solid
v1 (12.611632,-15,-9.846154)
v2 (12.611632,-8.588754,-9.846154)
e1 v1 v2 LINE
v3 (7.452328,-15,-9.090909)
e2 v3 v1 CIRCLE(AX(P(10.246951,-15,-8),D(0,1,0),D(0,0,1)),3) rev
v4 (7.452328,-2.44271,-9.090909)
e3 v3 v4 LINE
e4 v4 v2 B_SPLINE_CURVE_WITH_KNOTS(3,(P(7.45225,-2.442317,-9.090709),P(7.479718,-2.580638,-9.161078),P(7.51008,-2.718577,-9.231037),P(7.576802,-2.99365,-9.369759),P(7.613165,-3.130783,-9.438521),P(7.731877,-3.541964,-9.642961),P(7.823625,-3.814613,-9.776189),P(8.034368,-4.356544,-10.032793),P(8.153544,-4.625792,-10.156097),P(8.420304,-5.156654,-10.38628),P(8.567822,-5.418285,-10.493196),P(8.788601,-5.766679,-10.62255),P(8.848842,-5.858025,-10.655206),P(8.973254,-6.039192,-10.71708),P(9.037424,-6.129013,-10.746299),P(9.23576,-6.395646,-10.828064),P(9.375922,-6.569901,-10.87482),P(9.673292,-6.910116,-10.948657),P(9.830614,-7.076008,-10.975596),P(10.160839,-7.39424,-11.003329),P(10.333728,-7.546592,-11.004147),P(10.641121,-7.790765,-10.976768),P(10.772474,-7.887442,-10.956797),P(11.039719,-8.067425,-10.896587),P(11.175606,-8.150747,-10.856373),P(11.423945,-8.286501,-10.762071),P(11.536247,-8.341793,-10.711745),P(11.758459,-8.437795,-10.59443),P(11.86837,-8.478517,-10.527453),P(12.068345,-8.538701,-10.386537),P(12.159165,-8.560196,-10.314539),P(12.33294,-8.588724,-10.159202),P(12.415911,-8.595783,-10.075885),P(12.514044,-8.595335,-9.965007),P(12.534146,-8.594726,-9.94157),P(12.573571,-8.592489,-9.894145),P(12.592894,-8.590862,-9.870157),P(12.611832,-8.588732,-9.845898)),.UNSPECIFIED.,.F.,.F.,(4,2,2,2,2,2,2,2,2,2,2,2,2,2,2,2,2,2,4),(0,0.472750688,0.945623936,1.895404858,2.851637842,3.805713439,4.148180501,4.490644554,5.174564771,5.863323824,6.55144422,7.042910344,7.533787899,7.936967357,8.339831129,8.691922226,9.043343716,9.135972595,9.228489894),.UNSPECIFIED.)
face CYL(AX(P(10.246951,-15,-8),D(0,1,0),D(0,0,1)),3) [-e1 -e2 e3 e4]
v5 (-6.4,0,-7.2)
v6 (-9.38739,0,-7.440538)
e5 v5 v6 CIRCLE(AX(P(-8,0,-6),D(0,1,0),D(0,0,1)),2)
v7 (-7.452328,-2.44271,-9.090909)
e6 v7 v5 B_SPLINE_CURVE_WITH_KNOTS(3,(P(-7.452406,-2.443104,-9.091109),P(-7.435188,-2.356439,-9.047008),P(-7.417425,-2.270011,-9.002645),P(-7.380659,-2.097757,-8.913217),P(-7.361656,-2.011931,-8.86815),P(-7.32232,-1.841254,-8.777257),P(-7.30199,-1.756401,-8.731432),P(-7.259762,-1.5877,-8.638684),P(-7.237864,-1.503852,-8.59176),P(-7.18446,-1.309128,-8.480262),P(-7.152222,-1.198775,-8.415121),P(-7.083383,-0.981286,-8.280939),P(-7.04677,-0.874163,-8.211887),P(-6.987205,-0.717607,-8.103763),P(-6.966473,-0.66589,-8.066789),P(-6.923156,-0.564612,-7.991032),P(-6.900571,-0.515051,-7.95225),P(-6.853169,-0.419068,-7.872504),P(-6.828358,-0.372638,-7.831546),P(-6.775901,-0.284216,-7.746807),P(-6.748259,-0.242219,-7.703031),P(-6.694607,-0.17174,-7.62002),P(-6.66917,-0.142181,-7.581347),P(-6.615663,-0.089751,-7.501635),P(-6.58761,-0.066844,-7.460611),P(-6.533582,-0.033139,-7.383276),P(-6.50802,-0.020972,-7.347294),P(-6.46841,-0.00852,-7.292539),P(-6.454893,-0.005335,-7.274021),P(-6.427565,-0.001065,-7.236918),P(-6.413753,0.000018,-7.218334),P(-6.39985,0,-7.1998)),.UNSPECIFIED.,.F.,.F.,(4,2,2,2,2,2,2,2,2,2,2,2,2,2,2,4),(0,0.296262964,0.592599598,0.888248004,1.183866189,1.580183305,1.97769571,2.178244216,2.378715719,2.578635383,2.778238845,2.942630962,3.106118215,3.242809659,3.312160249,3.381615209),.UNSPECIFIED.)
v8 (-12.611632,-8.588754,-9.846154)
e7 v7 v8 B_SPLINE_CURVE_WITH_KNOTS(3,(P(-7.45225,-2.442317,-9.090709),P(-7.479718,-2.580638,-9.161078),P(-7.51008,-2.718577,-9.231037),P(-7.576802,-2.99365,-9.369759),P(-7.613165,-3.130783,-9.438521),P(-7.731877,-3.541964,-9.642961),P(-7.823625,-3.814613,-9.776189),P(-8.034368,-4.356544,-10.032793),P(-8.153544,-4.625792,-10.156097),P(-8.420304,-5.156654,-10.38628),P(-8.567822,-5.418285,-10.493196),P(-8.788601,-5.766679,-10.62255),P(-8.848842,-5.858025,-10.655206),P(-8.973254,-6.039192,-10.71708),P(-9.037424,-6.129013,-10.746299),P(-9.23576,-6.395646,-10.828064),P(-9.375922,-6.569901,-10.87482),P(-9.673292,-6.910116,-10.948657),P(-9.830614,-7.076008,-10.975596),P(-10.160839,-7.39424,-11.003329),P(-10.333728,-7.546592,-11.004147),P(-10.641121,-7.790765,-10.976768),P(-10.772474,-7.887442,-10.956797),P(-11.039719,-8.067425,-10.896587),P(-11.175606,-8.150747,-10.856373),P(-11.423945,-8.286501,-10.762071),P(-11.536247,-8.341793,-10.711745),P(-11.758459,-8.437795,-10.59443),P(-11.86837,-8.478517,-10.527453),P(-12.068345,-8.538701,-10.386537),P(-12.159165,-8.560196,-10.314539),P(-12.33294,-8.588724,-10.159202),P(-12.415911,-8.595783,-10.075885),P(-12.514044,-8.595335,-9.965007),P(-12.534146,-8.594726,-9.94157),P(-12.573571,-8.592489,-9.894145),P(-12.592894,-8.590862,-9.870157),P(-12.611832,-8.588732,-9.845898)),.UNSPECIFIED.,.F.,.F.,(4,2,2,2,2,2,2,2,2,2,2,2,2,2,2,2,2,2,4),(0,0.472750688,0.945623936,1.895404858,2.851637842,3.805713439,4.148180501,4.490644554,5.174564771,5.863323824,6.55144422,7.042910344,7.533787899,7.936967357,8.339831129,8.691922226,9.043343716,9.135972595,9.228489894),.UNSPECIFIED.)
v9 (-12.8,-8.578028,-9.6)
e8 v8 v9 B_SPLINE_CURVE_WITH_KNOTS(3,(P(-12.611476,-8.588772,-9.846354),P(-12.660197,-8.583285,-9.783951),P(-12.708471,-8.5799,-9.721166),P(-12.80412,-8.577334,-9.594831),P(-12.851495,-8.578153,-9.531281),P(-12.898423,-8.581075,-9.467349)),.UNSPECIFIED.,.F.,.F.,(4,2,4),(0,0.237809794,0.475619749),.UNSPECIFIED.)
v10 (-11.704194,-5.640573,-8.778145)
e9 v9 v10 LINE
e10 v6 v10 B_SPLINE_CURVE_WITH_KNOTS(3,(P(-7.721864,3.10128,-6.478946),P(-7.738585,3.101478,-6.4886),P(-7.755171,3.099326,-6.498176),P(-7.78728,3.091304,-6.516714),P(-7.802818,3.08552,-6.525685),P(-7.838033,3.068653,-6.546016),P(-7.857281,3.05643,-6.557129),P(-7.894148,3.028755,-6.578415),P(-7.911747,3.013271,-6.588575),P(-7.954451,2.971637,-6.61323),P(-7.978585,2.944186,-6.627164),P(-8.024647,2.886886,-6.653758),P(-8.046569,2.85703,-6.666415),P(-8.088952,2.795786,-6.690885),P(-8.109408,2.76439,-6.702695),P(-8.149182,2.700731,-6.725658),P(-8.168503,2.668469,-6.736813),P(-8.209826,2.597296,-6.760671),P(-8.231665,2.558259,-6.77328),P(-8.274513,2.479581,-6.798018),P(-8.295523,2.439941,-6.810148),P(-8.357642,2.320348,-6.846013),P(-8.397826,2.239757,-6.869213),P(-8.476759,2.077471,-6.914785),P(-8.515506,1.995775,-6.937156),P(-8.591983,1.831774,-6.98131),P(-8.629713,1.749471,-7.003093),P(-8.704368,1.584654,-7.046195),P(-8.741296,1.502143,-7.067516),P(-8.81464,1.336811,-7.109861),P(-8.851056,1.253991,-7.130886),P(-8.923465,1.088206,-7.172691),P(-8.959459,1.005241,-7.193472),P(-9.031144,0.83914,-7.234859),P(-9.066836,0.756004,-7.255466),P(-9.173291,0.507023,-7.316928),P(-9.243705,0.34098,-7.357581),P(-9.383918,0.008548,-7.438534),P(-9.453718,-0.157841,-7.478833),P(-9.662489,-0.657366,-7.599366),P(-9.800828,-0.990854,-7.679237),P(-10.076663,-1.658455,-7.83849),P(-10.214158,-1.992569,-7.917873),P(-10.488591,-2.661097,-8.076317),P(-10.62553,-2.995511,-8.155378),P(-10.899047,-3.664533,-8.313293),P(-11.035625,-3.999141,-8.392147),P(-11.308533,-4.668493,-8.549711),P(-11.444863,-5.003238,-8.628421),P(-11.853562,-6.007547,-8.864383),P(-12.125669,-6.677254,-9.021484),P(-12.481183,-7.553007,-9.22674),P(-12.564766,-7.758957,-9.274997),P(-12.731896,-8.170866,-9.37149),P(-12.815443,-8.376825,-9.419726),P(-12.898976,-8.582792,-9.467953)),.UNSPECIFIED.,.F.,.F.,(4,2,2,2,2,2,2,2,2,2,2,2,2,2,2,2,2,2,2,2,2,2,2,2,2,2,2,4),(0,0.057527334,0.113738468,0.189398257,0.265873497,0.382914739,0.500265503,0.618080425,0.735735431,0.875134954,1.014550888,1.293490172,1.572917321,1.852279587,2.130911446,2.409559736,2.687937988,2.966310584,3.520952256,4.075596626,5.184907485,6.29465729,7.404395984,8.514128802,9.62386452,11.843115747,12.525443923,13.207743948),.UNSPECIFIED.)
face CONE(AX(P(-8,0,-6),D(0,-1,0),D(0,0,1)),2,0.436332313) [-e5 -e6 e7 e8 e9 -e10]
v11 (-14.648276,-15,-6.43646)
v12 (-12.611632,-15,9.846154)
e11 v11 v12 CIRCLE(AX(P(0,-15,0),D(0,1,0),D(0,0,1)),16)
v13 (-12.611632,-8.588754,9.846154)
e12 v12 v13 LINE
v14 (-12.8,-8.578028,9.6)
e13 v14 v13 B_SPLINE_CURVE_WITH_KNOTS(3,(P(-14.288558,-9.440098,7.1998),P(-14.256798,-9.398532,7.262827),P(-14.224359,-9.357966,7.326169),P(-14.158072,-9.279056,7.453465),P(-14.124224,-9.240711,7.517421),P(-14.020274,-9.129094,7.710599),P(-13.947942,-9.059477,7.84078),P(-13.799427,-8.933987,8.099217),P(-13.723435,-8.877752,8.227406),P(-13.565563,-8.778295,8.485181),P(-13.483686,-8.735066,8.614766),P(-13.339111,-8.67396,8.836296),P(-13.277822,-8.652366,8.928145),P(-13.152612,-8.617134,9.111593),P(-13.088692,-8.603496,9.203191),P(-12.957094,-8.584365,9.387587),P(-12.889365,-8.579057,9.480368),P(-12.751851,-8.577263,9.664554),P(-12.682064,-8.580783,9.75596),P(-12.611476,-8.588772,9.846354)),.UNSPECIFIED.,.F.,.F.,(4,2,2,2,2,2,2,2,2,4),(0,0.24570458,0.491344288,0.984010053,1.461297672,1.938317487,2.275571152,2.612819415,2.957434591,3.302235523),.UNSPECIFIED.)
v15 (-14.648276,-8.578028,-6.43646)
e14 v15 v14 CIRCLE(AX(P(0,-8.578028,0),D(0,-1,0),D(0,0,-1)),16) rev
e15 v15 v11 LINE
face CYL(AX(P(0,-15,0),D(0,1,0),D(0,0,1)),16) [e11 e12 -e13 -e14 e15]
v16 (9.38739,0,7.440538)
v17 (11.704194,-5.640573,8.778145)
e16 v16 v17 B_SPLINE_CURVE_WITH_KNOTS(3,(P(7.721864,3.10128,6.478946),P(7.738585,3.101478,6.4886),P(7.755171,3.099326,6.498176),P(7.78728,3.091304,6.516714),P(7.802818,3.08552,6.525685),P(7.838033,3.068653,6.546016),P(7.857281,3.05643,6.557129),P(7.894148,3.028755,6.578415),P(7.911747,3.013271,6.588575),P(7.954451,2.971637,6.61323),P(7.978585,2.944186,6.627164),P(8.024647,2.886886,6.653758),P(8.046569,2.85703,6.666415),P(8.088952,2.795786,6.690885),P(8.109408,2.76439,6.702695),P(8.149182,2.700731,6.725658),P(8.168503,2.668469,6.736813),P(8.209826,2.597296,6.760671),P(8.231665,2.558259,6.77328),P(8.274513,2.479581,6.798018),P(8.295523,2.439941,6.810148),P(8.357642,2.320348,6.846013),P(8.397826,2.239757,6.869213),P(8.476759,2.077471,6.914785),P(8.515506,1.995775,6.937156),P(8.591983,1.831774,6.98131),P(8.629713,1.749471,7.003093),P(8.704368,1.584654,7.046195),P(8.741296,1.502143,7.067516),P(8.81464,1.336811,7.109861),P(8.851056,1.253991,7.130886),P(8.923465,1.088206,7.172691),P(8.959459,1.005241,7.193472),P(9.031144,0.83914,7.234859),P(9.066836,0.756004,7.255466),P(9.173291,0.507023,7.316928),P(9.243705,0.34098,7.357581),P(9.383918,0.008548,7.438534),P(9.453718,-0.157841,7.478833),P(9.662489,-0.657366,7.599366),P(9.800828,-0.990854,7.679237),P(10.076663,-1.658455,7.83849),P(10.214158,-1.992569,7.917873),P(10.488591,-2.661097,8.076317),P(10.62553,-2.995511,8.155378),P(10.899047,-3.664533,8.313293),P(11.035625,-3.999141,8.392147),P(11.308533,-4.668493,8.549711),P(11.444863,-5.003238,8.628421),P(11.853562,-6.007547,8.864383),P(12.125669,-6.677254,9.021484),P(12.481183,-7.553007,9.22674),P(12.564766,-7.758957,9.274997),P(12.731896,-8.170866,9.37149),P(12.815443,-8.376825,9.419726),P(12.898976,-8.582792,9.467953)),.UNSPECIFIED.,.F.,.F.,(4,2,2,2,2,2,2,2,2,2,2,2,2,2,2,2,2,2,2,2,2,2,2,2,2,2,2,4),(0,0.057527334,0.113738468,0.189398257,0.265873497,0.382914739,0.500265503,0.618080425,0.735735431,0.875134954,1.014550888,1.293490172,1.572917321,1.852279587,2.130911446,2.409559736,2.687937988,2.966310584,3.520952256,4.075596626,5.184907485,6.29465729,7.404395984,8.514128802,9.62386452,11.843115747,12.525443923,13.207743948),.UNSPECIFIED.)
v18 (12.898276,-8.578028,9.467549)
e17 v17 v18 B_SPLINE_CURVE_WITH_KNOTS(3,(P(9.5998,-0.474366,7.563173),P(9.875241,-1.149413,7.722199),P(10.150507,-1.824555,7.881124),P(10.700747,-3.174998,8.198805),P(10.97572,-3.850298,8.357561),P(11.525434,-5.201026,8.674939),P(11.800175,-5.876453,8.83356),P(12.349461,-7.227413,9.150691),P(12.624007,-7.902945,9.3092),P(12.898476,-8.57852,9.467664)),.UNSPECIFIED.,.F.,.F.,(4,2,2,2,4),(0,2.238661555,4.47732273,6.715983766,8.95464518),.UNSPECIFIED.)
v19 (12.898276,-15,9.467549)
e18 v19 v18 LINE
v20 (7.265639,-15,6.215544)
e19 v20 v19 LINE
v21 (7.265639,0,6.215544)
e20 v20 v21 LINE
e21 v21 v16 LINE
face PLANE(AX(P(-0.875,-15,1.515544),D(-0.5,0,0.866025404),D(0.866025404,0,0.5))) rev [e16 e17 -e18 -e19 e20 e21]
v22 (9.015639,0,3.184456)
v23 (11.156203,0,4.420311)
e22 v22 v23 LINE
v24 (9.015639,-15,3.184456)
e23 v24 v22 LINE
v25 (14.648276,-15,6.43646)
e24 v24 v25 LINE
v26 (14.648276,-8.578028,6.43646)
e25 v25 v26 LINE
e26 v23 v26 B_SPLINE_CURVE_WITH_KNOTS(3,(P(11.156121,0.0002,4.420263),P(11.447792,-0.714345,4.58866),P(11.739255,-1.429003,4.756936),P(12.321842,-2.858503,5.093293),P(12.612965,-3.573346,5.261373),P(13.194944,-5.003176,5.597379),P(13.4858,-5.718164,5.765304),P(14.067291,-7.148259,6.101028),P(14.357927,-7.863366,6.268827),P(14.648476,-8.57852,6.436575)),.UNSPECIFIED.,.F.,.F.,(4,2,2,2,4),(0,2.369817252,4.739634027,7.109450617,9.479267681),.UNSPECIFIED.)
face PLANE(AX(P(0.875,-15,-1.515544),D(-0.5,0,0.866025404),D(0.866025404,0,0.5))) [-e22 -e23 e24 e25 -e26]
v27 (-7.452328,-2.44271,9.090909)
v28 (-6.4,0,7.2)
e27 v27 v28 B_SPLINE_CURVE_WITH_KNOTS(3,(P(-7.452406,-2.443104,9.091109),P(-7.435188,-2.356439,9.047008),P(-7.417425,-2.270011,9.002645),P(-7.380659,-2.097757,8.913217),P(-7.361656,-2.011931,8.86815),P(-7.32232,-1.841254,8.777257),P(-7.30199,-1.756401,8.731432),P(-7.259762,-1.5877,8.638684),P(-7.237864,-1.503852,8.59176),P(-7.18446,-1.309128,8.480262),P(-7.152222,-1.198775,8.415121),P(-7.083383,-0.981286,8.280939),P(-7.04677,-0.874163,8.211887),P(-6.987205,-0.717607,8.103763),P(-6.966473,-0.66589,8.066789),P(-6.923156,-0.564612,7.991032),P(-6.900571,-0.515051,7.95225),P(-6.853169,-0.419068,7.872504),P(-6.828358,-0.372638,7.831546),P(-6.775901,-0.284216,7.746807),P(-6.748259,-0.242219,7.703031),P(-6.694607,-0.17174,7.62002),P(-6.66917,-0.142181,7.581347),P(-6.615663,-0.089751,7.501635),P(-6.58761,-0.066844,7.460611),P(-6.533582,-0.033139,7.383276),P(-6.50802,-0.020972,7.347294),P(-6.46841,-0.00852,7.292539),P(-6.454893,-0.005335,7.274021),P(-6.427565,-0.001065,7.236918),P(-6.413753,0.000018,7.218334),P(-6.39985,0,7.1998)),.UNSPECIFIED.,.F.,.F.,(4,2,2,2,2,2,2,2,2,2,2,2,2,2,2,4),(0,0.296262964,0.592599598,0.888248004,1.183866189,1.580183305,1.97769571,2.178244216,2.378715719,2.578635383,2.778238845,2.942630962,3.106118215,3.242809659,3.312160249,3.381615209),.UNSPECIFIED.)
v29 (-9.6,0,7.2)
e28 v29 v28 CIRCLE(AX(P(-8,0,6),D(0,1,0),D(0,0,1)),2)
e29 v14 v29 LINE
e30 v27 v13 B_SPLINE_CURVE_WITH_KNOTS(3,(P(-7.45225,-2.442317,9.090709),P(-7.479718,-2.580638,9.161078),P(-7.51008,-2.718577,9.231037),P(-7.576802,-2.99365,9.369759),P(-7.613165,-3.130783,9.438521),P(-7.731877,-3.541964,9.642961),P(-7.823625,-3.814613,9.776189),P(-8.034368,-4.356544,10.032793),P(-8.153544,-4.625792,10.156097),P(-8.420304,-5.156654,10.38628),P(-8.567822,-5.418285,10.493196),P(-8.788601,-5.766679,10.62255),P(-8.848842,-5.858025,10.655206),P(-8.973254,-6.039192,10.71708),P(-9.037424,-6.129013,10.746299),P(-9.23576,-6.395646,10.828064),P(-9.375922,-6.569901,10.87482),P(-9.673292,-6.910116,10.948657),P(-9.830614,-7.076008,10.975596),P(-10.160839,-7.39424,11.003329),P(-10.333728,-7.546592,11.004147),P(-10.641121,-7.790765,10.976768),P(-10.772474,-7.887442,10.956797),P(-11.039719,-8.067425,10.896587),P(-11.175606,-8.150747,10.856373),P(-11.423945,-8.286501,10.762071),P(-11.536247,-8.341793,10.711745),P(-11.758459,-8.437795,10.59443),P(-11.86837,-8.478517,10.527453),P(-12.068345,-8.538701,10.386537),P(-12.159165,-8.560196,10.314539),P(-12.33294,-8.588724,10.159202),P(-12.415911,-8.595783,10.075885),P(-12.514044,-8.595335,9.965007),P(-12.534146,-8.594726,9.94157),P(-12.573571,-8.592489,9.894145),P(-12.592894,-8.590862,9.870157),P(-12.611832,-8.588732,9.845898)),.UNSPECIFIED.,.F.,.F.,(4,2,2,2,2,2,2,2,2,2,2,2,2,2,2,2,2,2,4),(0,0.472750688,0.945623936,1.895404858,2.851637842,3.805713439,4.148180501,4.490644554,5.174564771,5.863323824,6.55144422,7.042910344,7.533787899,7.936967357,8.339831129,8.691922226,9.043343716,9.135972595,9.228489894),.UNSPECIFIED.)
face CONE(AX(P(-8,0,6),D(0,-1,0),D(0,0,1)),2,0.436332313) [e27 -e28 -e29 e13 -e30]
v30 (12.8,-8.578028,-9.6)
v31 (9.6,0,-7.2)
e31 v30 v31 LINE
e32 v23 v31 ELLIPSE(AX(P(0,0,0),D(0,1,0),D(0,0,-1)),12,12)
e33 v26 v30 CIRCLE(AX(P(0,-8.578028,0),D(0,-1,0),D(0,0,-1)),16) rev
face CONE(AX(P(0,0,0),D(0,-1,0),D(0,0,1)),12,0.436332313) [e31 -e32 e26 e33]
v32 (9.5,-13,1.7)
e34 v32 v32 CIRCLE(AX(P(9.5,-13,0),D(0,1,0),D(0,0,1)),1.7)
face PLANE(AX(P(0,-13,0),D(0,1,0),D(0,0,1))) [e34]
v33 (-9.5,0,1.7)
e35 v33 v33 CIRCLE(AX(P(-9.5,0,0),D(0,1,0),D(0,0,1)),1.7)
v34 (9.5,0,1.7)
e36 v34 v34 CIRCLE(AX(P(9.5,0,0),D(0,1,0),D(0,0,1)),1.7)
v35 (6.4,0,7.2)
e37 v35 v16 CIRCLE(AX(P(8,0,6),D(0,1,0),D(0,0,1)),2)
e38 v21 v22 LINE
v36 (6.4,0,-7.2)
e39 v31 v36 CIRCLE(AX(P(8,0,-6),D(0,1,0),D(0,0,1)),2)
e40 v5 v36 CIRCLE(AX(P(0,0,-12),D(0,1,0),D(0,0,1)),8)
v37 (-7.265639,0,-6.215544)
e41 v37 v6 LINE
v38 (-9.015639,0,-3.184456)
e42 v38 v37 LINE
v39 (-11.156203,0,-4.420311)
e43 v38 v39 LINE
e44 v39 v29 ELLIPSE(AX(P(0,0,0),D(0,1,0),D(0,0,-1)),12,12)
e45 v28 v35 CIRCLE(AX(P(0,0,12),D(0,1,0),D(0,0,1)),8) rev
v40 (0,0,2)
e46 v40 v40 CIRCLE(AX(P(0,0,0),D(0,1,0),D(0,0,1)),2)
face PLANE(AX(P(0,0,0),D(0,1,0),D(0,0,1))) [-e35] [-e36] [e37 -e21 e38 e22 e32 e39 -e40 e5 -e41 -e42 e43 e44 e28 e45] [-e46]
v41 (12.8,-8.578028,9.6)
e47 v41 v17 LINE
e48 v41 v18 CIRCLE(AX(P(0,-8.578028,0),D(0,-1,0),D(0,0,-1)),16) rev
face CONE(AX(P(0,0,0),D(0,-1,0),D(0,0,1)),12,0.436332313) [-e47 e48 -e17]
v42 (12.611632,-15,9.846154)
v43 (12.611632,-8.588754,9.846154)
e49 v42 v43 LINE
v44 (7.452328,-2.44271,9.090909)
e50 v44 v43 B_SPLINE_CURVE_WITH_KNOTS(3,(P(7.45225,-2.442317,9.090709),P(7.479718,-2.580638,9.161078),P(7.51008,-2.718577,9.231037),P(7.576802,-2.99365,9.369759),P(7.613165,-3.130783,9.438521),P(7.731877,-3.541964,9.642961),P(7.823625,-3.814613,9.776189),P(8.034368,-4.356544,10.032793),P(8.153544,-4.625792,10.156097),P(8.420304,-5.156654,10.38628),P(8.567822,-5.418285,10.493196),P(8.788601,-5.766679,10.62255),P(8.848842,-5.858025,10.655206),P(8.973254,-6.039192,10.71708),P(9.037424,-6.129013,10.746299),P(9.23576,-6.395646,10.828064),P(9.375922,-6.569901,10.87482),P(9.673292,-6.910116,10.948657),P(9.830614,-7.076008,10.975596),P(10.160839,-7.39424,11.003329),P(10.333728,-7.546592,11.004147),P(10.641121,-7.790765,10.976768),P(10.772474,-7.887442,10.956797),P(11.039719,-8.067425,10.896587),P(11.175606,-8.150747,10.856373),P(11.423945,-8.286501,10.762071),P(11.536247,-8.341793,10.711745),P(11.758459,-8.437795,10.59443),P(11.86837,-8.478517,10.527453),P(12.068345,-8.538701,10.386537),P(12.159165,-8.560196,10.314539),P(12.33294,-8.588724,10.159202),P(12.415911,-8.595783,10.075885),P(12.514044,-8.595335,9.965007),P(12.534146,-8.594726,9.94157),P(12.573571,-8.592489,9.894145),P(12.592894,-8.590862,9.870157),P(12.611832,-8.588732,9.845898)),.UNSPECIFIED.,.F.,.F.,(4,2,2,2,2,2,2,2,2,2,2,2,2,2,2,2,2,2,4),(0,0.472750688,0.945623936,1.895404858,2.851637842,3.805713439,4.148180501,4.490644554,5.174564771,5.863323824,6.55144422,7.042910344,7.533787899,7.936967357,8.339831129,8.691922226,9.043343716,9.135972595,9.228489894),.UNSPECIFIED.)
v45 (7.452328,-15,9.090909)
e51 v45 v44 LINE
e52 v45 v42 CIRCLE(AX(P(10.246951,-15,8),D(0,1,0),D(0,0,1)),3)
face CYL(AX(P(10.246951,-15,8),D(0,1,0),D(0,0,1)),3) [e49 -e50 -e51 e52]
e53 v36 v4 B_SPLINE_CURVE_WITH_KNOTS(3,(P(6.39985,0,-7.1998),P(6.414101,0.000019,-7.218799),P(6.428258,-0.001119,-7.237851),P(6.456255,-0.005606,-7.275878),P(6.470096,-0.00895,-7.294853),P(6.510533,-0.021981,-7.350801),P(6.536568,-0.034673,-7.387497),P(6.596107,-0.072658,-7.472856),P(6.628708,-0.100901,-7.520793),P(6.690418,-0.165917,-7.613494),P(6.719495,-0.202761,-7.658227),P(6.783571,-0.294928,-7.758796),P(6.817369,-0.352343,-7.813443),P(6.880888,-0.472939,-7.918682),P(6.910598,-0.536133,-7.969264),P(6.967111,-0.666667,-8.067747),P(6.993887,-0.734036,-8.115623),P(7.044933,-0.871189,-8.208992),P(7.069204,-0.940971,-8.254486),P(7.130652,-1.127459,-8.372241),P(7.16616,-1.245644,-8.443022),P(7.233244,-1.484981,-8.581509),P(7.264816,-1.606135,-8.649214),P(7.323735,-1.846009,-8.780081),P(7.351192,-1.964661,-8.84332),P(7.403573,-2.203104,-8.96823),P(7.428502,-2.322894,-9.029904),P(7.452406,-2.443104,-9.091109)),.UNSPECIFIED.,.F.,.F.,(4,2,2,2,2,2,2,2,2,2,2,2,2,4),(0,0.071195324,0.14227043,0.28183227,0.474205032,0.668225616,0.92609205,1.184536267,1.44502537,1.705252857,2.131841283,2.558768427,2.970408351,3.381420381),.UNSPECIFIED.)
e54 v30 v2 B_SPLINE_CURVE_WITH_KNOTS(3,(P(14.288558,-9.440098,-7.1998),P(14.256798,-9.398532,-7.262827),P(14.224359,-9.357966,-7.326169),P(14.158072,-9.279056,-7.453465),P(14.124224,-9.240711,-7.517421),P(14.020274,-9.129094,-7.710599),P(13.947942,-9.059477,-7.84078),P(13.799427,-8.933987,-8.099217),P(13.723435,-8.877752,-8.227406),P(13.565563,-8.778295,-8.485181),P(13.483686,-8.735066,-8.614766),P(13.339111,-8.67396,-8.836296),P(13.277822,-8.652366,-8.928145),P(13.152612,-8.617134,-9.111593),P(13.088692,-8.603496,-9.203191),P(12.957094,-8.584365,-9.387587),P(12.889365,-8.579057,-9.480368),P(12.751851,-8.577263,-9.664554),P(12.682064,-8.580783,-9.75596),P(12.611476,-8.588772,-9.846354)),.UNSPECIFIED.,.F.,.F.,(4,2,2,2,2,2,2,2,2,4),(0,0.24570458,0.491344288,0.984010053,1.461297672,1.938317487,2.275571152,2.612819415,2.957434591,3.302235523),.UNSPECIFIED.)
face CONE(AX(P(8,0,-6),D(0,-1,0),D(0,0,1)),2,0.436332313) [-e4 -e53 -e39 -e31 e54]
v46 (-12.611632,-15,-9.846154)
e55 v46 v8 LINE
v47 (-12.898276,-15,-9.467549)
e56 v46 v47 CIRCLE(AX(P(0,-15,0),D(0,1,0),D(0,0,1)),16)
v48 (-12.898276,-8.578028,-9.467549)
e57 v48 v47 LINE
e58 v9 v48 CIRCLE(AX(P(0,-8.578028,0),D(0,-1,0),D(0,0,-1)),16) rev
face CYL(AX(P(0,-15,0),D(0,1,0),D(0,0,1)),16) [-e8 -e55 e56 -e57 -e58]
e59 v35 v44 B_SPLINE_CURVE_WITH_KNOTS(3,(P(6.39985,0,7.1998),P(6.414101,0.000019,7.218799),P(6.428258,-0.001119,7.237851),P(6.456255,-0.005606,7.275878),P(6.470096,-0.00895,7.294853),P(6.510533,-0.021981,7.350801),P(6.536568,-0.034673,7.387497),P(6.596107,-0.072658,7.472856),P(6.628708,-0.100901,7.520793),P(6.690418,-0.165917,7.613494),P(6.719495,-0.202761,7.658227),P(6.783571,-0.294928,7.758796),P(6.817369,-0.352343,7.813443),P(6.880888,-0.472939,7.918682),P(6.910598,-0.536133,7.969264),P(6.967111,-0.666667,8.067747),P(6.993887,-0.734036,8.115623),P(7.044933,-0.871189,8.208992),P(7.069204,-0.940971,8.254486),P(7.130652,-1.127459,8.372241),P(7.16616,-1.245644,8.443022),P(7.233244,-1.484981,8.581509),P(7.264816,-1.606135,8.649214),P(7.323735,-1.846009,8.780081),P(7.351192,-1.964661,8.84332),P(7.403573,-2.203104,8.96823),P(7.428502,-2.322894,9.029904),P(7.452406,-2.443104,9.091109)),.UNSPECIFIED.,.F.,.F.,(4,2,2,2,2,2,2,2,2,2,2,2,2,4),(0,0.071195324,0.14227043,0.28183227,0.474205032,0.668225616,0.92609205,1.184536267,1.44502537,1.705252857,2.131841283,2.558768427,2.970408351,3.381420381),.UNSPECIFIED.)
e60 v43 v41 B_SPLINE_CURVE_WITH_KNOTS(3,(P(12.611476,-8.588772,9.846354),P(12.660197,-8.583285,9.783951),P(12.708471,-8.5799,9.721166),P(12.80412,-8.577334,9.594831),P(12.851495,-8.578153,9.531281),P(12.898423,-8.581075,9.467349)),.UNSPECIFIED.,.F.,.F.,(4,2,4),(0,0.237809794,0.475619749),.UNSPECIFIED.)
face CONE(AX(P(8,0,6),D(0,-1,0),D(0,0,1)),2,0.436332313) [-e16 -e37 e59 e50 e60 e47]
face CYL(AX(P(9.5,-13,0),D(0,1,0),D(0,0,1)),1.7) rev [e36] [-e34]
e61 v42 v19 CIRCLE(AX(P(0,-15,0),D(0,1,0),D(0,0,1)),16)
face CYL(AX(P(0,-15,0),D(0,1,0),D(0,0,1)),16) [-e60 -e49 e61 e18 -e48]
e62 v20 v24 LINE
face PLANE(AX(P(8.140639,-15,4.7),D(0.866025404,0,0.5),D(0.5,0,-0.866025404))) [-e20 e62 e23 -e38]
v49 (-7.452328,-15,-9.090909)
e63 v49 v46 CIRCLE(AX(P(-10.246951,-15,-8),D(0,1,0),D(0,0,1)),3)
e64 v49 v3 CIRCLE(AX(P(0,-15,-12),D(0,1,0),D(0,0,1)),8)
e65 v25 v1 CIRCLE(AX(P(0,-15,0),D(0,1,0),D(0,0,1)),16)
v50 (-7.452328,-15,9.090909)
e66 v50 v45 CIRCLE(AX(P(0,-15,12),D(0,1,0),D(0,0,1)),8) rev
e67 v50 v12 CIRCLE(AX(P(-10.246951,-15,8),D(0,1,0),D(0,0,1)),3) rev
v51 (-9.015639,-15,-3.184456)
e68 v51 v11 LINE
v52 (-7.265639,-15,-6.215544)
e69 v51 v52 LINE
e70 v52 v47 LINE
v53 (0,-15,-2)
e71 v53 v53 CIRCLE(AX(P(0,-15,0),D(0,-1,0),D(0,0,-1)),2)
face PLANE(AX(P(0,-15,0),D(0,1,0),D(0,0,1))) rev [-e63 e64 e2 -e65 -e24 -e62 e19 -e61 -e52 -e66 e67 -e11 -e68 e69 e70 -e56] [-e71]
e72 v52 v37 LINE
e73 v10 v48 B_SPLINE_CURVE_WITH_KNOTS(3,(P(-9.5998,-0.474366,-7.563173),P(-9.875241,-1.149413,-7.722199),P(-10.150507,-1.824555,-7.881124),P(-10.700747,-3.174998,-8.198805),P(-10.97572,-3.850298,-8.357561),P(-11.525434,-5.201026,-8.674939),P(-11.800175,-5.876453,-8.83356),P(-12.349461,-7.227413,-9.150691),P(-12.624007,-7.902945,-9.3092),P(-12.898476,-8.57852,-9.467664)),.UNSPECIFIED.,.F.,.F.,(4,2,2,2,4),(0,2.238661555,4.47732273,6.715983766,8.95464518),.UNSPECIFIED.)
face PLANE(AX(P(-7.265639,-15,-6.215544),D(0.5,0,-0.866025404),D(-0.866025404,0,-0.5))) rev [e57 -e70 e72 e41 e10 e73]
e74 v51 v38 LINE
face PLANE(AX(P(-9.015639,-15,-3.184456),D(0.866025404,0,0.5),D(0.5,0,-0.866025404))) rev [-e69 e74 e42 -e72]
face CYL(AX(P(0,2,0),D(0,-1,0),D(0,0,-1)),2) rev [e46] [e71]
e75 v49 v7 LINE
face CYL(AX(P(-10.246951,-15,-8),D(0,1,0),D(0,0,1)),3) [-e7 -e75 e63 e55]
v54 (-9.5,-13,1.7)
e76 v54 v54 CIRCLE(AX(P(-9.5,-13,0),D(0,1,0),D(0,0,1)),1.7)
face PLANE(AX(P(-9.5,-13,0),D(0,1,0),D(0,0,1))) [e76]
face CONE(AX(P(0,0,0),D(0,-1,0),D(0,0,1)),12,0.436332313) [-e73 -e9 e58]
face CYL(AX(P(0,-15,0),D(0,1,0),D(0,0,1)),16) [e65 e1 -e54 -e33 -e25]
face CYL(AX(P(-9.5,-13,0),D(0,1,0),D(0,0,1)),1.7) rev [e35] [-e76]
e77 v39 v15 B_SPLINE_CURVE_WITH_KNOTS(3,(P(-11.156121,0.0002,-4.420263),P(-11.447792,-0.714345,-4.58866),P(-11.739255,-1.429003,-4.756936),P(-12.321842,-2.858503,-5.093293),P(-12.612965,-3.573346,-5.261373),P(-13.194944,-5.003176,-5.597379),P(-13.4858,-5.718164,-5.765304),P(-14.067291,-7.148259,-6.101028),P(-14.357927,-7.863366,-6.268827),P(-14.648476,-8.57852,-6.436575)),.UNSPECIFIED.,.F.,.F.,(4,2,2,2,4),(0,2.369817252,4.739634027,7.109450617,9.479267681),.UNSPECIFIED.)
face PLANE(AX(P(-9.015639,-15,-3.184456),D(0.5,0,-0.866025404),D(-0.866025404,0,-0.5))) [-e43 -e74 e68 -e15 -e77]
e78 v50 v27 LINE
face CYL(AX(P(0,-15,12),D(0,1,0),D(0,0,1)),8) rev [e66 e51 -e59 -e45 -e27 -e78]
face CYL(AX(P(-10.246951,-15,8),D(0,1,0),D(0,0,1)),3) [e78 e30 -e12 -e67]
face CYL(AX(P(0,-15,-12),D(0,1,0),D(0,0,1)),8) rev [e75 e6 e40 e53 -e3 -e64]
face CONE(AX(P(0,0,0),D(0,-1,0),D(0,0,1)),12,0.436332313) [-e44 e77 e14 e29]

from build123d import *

# Parameters (mm, degrees)
BOSS_EXTRUDE1_DEPTH = 15
BOSS_EXTRUDE1_TAPER = -25
SKETCH2_R           = 2
CUT_EXTRUDE1_DEPTH  = 17
SKETCH3_R           = 32.062922841
CUT_EXTRUDE2_DEPTH  = 29.471632885
SKETCH1_3_R         = 1.7
CUT_EXTRUDE3_DEPTH  = 13


with BuildPart() as part:
    # Sketch1 → Boss-Extrude1 (new body)
    with BuildSketch(Plane(origin=(0, 0, 0), x_dir=(1, 0, 0), z_dir=(0, 1, 0))):
        with BuildLine():
            ThreePointArc((6.4, 7.2), (0, 4), (-6.4, 7.2))
            ThreePointArc((-6.4, 7.2), (-8, 8), (-9.6, 7.2))
            add(Edge.make_bspline(
                [(-9.6, 7.2), (-15, 0), (-9.6, -7.2)],
                knots=[2.498091545, 2.498091545, 2.498091545, 3.785093762, 3.785093762, 3.785093762], degree=2, weights=[1, 0.8, 1]))
            ThreePointArc((-9.6, -7.2), (-8, -8), (-6.4, -7.2))
            ThreePointArc((-6.4, -7.2), (0, -4), (6.4, -7.2))
            ThreePointArc((6.4, -7.2), (8, -8), (9.6, -7.2))
            add(Edge.make_bspline(
                [(9.6, -7.2), (15, 0), (9.6, 7.2)],
                knots=[5.639684198, 5.639684198, 5.639684198, 6.926686416, 6.926686416, 6.926686416], degree=2, weights=[1, 0.8, 1]))
            ThreePointArc((9.6, 7.2), (8, 8), (6.4, 7.2))
        make_face()
    extrude(amount=-BOSS_EXTRUDE1_DEPTH, taper=BOSS_EXTRUDE1_TAPER)

    # Sketch2 → Cut-Extrude1 (cut)
    with BuildSketch(Plane.XZ.offset(15)):
        Circle(SKETCH2_R)
    extrude(amount=-CUT_EXTRUDE1_DEPTH, mode=Mode.SUBTRACT)

    # Sketch3 → Cut-Extrude2 (cut, through all)
    with BuildSketch(Plane(origin=(0, 0, 0), x_dir=(1, 0, 0), z_dir=(0, 1, 0))):
        Circle(SKETCH3_R)
        with BuildLine():
            Line((9.015638796, -3.184455543), (7.265638796, -6.215544457))
            Line((7.265638796, -6.215544457), (12.898275754, -9.467548921))
            ThreePointArc((12.898275754, -9.467548921), (12.756358421, -9.657914881), (12.611631712, -9.846153846))
            ThreePointArc((12.611631712, -9.846153846), (9.812426671, -10.96836467), (7.45232783, -9.090909091))
            ThreePointArc((7.45232783, -9.090909091), (0, -4), (-7.45232783, -9.090909091))
            ThreePointArc((-7.45232783, -9.090909091), (-9.812426671, -10.96836467), (-12.611631712, -9.846153846))
            ThreePointArc((-12.611631712, -9.846153846), (-15.876287892, -1.985820424), (-14.648275754, 6.436460008))
            Line((-14.648275754, 6.436460008), (-9.015638796, 3.184455543))
            Line((-9.015638796, 3.184455543), (-7.265638796, 6.215544457))
            Line((-7.265638796, 6.215544457), (-12.898275754, 9.467548921))
            ThreePointArc((-12.898275754, 9.467548921), (-12.756358421, 9.657914881), (-12.611631712, 9.846153846))
            ThreePointArc((-12.611631712, 9.846153846), (-9.812426671, 10.96836467), (-7.45232783, 9.090909091))
            ThreePointArc((-7.45232783, 9.090909091), (0, 4), (7.45232783, 9.090909091))
            ThreePointArc((7.45232783, 9.090909091), (9.812426671, 10.96836467), (12.611631712, 9.846153846))
            ThreePointArc((12.611631712, 9.846153846), (15.876287892, 1.985820424), (14.648275754, -6.436460008))
            Line((14.648275754, -6.436460008), (11.156202507, -4.420310579))
            Line((11.156202507, -4.420310579), (9.015638796, -3.184455543))
        make_face(mode=Mode.SUBTRACT)
    extrude(amount=-CUT_EXTRUDE2_DEPTH, mode=Mode.SUBTRACT)

    # Sketch1<3> → Cut-Extrude3 (cut)
    with BuildSketch(Plane(origin=(0, 0, 0), x_dir=(1, 0, 0), z_dir=(0, 1, 0))):
        with Locations((-9.5, 0)):
            Circle(SKETCH1_3_R)
        with Locations((9.5, 0)):
            Circle(SKETCH1_3_R)
    extrude(amount=-CUT_EXTRUDE3_DEPTH, mode=Mode.SUBTRACT)


solid = part.part
